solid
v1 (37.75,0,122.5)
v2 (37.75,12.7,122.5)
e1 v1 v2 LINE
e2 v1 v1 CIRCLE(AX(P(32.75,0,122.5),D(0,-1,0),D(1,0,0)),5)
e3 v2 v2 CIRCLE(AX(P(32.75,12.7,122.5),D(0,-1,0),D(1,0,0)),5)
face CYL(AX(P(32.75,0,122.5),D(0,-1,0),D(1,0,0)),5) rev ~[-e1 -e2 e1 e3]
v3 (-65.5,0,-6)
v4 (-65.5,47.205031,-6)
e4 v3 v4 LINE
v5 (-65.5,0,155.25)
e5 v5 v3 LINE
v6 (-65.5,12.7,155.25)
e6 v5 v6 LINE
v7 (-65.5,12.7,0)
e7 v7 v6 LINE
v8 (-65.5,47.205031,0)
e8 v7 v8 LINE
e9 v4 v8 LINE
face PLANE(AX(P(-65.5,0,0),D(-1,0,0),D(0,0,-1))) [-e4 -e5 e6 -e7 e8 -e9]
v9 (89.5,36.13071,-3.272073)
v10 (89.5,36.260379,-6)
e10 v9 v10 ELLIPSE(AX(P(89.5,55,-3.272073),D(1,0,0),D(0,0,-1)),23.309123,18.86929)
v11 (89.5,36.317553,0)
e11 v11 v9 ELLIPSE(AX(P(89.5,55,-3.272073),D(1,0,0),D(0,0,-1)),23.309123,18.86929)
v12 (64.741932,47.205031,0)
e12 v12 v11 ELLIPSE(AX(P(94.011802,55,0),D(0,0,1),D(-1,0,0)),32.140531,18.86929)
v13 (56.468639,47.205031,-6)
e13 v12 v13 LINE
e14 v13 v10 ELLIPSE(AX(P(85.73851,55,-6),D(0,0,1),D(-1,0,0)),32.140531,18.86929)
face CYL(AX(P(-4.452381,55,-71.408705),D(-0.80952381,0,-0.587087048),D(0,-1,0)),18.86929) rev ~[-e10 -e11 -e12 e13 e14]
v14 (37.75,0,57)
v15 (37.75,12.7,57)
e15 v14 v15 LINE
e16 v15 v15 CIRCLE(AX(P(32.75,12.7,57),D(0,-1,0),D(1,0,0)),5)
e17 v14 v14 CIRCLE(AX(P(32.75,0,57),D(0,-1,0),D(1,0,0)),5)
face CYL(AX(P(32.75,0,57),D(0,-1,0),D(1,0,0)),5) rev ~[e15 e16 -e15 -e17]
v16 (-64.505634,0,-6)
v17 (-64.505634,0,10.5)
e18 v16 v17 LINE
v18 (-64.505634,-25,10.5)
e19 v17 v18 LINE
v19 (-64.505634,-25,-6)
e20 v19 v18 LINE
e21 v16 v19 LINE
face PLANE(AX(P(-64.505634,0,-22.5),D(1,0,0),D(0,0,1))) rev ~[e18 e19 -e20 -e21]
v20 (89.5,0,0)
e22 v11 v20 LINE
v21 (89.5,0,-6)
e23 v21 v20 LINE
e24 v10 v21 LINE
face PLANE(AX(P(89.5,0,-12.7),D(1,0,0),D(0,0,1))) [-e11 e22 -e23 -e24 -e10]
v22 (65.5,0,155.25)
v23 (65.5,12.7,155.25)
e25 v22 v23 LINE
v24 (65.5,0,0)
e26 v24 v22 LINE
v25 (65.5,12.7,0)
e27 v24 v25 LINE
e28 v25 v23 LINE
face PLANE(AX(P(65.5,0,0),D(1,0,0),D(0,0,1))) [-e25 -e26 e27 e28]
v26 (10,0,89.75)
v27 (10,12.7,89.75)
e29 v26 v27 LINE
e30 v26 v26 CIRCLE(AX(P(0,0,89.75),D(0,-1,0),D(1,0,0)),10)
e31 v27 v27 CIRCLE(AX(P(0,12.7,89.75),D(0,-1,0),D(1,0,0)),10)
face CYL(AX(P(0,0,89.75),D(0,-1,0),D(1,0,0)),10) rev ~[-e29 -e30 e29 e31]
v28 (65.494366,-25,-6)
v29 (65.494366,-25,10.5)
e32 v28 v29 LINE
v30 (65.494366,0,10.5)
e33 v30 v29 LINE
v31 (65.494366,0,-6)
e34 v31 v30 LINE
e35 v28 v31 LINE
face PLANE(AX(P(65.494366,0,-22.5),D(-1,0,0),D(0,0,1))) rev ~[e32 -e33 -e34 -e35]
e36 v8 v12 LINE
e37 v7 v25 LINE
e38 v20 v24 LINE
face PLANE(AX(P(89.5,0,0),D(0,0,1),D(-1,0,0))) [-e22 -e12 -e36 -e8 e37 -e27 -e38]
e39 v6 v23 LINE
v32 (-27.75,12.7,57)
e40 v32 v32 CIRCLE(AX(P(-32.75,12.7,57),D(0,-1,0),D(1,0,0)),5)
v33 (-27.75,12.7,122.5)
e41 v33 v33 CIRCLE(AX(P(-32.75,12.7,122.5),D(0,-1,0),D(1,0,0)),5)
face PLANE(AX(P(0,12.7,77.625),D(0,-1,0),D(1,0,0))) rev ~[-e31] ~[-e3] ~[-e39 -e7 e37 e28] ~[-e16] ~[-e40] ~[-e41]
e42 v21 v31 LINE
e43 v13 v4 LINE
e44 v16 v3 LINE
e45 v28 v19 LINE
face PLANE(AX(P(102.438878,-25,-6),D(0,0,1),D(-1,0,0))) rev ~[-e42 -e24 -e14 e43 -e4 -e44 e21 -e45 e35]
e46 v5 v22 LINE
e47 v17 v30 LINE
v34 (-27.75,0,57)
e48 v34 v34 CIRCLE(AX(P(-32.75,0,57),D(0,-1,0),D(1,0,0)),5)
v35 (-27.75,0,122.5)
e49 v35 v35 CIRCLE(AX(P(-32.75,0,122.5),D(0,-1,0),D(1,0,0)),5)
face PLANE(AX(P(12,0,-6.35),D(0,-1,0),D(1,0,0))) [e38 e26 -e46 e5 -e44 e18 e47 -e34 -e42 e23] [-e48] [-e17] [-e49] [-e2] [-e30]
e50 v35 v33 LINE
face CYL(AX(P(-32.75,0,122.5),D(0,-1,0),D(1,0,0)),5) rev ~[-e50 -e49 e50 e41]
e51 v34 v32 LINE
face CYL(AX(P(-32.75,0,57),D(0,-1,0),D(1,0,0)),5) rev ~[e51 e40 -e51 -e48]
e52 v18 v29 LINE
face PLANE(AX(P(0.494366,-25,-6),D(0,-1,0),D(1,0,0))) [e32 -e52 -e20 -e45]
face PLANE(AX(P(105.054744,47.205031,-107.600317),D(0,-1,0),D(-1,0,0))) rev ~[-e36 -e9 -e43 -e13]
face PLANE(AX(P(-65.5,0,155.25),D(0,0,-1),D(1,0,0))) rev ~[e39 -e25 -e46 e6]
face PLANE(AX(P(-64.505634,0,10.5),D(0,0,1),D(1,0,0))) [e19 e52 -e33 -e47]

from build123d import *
from build123d import SkipClean  # not in build123d's __all__

# Parameters (mm, degrees)
F0_W      = 131
F0_H      = 155.25
F0_R      = 5
F0_R_2    = 10
F1_DEPTH  = 12.7
F2_DEPTH  = 150
F3_R      = 4.7625
F4_DEPTH  = 167.951
F6_DEPTH  = 55
F9_W      = 46.4503765106
F9_H      = 23.6088857055
F10_DEPTH = 100.6187200546
F12_DEPTH = 150.001
F14_DEPTH = 89.0000760555
F15_R     = 18.8692896997
F16_DEPTH = 210.4837932836
F18_W     = 28.0103459954
F18_H     = 33.3821959794
F19_DEPTH = 57.4413500726
F23_DEPTH = 37.3063087463
F25_DEPTH = 262.8513174901
F26_W     = 130
F26_H     = 33
F27_DEPTH = 25
F28_DEPTH = 47.1665114164
F29_W     = 130
F29_H     = 16.5
F30_DEPTH = 374.0004003048


with BuildPart() as f1:
    # F0 (on Front) → F1 (new body)
    with BuildSketch(Plane.XZ):
        with Locations((0, 77.625)):
            Rectangle(F0_W, F0_H)
        with Locations((-32.75, 57)):
            Circle(F0_R, mode=Mode.SUBTRACT)
        with Locations((32.75, 57)):
            Circle(F0_R, mode=Mode.SUBTRACT)
        with Locations((0, 89.75)):
            Circle(F0_R_2, mode=Mode.SUBTRACT)
        with Locations((-32.75, 122.5)):
            Circle(F0_R, mode=Mode.SUBTRACT)
        with Locations((32.75, 122.5)):
            Circle(F0_R, mode=Mode.SUBTRACT)
    extrude(amount=-F1_DEPTH)

    # F0 (on Front) → F2 (join)
    with BuildSketch(Plane.XZ):
        Polygon((89.5, 0), (65.5, 0), (-65.5, 0), (-65.5, -12.7), (89.5, -12.7), align=None)
    extrude(amount=-F2_DEPTH)

    # F3 (on face) → F4 (cut, through all)
    with BuildSketch(Plane(origin=(0, 0, -12.7), x_dir=(1, 0, 0), z_dir=(0, 0, -1))):
        with Locations((-40, -55.7)):
            Circle(F3_R)
        with Locations((-40, -118.2)):
            Circle(F3_R)
        with Locations((64, -118.2)):
            Circle(F3_R)
        with Locations((64, -55.7)):
            Circle(F3_R)
    extrude(amount=-F4_DEPTH, mode=Mode.SUBTRACT)

    # F5 (on face) → F6 (join)
    with BuildSketch(Plane.XZ):
        Polygon((76.5, -12.7), (-63.5, -12.7), (-44.9285714286, -100.7630571853), align=None)
    extrude(amount=-F6_DEPTH)

    # F7 (on face) → F8 (revolve)
    with BuildSketch(Plane(origin=(32.4031609217, 0, -44.6801379177), x_dir=(0.8095238095, 0, 0.5870870479), z_dir=(0.5870870479, 0, -0.8095238095))):
        Polygon((18.2698592544, -37.5), (54.4725659202, -37.5), (54.4725659202, -30), (-45.5274340798, -30), (-45.5274340798, -37.5), align=None)
    revolve(axis=Axis((36.0238095238, 55, -42.0543523951), (-0.8095238095, 0, -0.5870870479)))

    # F9 (on face) → F10 (cut)
    with BuildSketch(Plane.YZ.offset(89.5)):
        with Locations((57.3695674539, 11.8044428527)):
            Rectangle(F9_W, F9_H)
    extrude(amount=-F10_DEPTH, mode=Mode.SUBTRACT)

    # F11 (on Front) → F12 (cut, through all)
    with BuildSketch(Plane.XZ):
        Polygon((-55.6169226766, -72.8361010551), (-44.6262694895, -72.8361010551), (-44.6262694895, -12.6905664802), (-63.8953074813, -12.6905664802), (-63.8953074813, -72.8361010551), align=None)
        Polygon((-4.5890193433, -104.113265872), (-4.5890193433, -72.8361010551), (-44.6262694895, -72.8361010551), (-55.6169226766, -72.8361010551), (-55.6169226766, -104.113265872), align=None)
    extrude(amount=-F12_DEPTH, mode=Mode.SUBTRACT)

    # F13 (on face) → F14 (cut)
    with BuildSketch(Plane(origin=(0, 55, 0), x_dir=(-1, 0, 0), z_dir=(0, 1, 0))):
        Polygon((76.3912552581, -71.6465198879), (44.6262694895, -60.2878452083), (44.6262694895, -72.8361010551), (6.4205920826, -72.8361010551), (4.4523809524, -71.4087047902), (-10.0519139283, -91.4084170785), (37.2047263411, -125.6801223738), align=None)
        Polygon((44.6262694895, -60.2878452083), (19.1295571499, -51.1706095521), (14.7264042907, -57.2420381235), (4.4523809524, -71.4087047902), (6.4205920826, -72.8361010551), (44.6262694895, -72.8361010551), align=None)
    extrude(amount=-F14_DEPTH, mode=Mode.SUBTRACT)

    # F15 (on face) → F16 (cut, through all)
    with BuildSketch(Plane(origin=(-36.8555418741, 0, -26.7285668724), x_dir=(0, -1, 0), z_dir=(-0.8095238095, 0, -0.5870870479))):
        with Locations((-55, -55.1931115454)):
            Circle(F15_R)
        with BuildLine():
            ThreePointArc((-37.5, -55.1931115454), (-67.3743686708, -67.5674802162), (-55, -37.6931115454))
            Line((-55, -37.6931115454), (-55, -55.1931115454))
            Line((-55, -55.1931115454), (-37.5, -55.1931115454))
        make_face(mode=Mode.SUBTRACT)
        with BuildLine():
            Line((-55, -55.1931115454), (-55, -37.6931115454))
            ThreePointArc((-55, -37.6931115454), (-67.3743686708, -67.5674802162), (-37.5, -55.1931115454))
            Line((-37.5, -55.1931115454), (-55, -55.1931115454))
        make_face()
    with SkipClean():  # cleaning this boolean's faces spoils the solid; the shape is the same uncleaned
        extrude(amount=-F16_DEPTH, mode=Mode.SUBTRACT)

    # F18 (on offset) → F19 (cut)
    with BuildSketch(Plane(origin=(0, 0, -69.7121929049), x_dir=(1, 0, 0), z_dir=(0, 0, -1))):
        with Locations((-40.2482412755, -55.8588486165)):
            Rectangle(F18_W, F18_H)
    with SkipClean():  # cleaning this boolean's faces spoils the solid; the shape is the same uncleaned
        extrude(amount=-F19_DEPTH, mode=Mode.SUBTRACT)

    # F22 (on offset) → F23 (join)
    with BuildSketch(Plane(origin=(0, 66.3563400507, 0), x_dir=(-1, 0, 0), z_dir=(0, 1, 0))):
        Polygon((-19.5, -25.368578732), (9.2864632607, -47.1396760544), (25.5, -47.1396760544), (25.5, -10.8354373375), (-19.5, -10.8354373375), align=None)
    with SkipClean():  # cleaning this boolean's faces spoils the solid; the shape is the same uncleaned
        extrude(amount=-F23_DEPTH)

    # F24 (on offset) → F25 (cut, through all)
    with BuildSketch(Plane(origin=(0, 0, -107.6003174901), x_dir=(1, 0, 0), z_dir=(0, 0, -1))):
        Polygon((105.054743588, -47.2050309181), (-70.2532827854, -47.2050309181), (-70.2532827854, -164.4858419895), (108.5324063897, -164.4858419895), align=None)
    extrude(amount=-F25_DEPTH, mode=Mode.SUBTRACT)

    # F26 (on Front) → F27 (join)
    with BuildSketch(Plane.XZ):
        with Locations((0.4943662184, -6)):
            Rectangle(F26_W, F26_H)
    extrude(amount=F27_DEPTH)

    # F28 (add): a face of the model
    f28_faces = [f1.faces().sort_by_distance(p)[0] for p in [
        (-54.5656671683, 0, -17.5954279167),
    ]]
    extrude(f28_faces, amount=F28_DEPTH)

    # F29 (on face) → F30 (cut)
    with BuildSketch(Plane.XZ.offset(25)):
        Polygon((102.4388783057, -90.8307954669), (102.4388783057, -6), (65.4943662184, -6), (65.4943662184, -22.5), (-64.5056337816, -22.5), (-64.5056337816, -6), (-95.0750373681, -6), (-96.5073853731, -90.8307954669), align=None)
        with Locations((0.4943662184, -14.25)):
            Rectangle(F29_W, F29_H)
    extrude(amount=-F30_DEPTH, mode=Mode.SUBTRACT)


solid = f1.part
